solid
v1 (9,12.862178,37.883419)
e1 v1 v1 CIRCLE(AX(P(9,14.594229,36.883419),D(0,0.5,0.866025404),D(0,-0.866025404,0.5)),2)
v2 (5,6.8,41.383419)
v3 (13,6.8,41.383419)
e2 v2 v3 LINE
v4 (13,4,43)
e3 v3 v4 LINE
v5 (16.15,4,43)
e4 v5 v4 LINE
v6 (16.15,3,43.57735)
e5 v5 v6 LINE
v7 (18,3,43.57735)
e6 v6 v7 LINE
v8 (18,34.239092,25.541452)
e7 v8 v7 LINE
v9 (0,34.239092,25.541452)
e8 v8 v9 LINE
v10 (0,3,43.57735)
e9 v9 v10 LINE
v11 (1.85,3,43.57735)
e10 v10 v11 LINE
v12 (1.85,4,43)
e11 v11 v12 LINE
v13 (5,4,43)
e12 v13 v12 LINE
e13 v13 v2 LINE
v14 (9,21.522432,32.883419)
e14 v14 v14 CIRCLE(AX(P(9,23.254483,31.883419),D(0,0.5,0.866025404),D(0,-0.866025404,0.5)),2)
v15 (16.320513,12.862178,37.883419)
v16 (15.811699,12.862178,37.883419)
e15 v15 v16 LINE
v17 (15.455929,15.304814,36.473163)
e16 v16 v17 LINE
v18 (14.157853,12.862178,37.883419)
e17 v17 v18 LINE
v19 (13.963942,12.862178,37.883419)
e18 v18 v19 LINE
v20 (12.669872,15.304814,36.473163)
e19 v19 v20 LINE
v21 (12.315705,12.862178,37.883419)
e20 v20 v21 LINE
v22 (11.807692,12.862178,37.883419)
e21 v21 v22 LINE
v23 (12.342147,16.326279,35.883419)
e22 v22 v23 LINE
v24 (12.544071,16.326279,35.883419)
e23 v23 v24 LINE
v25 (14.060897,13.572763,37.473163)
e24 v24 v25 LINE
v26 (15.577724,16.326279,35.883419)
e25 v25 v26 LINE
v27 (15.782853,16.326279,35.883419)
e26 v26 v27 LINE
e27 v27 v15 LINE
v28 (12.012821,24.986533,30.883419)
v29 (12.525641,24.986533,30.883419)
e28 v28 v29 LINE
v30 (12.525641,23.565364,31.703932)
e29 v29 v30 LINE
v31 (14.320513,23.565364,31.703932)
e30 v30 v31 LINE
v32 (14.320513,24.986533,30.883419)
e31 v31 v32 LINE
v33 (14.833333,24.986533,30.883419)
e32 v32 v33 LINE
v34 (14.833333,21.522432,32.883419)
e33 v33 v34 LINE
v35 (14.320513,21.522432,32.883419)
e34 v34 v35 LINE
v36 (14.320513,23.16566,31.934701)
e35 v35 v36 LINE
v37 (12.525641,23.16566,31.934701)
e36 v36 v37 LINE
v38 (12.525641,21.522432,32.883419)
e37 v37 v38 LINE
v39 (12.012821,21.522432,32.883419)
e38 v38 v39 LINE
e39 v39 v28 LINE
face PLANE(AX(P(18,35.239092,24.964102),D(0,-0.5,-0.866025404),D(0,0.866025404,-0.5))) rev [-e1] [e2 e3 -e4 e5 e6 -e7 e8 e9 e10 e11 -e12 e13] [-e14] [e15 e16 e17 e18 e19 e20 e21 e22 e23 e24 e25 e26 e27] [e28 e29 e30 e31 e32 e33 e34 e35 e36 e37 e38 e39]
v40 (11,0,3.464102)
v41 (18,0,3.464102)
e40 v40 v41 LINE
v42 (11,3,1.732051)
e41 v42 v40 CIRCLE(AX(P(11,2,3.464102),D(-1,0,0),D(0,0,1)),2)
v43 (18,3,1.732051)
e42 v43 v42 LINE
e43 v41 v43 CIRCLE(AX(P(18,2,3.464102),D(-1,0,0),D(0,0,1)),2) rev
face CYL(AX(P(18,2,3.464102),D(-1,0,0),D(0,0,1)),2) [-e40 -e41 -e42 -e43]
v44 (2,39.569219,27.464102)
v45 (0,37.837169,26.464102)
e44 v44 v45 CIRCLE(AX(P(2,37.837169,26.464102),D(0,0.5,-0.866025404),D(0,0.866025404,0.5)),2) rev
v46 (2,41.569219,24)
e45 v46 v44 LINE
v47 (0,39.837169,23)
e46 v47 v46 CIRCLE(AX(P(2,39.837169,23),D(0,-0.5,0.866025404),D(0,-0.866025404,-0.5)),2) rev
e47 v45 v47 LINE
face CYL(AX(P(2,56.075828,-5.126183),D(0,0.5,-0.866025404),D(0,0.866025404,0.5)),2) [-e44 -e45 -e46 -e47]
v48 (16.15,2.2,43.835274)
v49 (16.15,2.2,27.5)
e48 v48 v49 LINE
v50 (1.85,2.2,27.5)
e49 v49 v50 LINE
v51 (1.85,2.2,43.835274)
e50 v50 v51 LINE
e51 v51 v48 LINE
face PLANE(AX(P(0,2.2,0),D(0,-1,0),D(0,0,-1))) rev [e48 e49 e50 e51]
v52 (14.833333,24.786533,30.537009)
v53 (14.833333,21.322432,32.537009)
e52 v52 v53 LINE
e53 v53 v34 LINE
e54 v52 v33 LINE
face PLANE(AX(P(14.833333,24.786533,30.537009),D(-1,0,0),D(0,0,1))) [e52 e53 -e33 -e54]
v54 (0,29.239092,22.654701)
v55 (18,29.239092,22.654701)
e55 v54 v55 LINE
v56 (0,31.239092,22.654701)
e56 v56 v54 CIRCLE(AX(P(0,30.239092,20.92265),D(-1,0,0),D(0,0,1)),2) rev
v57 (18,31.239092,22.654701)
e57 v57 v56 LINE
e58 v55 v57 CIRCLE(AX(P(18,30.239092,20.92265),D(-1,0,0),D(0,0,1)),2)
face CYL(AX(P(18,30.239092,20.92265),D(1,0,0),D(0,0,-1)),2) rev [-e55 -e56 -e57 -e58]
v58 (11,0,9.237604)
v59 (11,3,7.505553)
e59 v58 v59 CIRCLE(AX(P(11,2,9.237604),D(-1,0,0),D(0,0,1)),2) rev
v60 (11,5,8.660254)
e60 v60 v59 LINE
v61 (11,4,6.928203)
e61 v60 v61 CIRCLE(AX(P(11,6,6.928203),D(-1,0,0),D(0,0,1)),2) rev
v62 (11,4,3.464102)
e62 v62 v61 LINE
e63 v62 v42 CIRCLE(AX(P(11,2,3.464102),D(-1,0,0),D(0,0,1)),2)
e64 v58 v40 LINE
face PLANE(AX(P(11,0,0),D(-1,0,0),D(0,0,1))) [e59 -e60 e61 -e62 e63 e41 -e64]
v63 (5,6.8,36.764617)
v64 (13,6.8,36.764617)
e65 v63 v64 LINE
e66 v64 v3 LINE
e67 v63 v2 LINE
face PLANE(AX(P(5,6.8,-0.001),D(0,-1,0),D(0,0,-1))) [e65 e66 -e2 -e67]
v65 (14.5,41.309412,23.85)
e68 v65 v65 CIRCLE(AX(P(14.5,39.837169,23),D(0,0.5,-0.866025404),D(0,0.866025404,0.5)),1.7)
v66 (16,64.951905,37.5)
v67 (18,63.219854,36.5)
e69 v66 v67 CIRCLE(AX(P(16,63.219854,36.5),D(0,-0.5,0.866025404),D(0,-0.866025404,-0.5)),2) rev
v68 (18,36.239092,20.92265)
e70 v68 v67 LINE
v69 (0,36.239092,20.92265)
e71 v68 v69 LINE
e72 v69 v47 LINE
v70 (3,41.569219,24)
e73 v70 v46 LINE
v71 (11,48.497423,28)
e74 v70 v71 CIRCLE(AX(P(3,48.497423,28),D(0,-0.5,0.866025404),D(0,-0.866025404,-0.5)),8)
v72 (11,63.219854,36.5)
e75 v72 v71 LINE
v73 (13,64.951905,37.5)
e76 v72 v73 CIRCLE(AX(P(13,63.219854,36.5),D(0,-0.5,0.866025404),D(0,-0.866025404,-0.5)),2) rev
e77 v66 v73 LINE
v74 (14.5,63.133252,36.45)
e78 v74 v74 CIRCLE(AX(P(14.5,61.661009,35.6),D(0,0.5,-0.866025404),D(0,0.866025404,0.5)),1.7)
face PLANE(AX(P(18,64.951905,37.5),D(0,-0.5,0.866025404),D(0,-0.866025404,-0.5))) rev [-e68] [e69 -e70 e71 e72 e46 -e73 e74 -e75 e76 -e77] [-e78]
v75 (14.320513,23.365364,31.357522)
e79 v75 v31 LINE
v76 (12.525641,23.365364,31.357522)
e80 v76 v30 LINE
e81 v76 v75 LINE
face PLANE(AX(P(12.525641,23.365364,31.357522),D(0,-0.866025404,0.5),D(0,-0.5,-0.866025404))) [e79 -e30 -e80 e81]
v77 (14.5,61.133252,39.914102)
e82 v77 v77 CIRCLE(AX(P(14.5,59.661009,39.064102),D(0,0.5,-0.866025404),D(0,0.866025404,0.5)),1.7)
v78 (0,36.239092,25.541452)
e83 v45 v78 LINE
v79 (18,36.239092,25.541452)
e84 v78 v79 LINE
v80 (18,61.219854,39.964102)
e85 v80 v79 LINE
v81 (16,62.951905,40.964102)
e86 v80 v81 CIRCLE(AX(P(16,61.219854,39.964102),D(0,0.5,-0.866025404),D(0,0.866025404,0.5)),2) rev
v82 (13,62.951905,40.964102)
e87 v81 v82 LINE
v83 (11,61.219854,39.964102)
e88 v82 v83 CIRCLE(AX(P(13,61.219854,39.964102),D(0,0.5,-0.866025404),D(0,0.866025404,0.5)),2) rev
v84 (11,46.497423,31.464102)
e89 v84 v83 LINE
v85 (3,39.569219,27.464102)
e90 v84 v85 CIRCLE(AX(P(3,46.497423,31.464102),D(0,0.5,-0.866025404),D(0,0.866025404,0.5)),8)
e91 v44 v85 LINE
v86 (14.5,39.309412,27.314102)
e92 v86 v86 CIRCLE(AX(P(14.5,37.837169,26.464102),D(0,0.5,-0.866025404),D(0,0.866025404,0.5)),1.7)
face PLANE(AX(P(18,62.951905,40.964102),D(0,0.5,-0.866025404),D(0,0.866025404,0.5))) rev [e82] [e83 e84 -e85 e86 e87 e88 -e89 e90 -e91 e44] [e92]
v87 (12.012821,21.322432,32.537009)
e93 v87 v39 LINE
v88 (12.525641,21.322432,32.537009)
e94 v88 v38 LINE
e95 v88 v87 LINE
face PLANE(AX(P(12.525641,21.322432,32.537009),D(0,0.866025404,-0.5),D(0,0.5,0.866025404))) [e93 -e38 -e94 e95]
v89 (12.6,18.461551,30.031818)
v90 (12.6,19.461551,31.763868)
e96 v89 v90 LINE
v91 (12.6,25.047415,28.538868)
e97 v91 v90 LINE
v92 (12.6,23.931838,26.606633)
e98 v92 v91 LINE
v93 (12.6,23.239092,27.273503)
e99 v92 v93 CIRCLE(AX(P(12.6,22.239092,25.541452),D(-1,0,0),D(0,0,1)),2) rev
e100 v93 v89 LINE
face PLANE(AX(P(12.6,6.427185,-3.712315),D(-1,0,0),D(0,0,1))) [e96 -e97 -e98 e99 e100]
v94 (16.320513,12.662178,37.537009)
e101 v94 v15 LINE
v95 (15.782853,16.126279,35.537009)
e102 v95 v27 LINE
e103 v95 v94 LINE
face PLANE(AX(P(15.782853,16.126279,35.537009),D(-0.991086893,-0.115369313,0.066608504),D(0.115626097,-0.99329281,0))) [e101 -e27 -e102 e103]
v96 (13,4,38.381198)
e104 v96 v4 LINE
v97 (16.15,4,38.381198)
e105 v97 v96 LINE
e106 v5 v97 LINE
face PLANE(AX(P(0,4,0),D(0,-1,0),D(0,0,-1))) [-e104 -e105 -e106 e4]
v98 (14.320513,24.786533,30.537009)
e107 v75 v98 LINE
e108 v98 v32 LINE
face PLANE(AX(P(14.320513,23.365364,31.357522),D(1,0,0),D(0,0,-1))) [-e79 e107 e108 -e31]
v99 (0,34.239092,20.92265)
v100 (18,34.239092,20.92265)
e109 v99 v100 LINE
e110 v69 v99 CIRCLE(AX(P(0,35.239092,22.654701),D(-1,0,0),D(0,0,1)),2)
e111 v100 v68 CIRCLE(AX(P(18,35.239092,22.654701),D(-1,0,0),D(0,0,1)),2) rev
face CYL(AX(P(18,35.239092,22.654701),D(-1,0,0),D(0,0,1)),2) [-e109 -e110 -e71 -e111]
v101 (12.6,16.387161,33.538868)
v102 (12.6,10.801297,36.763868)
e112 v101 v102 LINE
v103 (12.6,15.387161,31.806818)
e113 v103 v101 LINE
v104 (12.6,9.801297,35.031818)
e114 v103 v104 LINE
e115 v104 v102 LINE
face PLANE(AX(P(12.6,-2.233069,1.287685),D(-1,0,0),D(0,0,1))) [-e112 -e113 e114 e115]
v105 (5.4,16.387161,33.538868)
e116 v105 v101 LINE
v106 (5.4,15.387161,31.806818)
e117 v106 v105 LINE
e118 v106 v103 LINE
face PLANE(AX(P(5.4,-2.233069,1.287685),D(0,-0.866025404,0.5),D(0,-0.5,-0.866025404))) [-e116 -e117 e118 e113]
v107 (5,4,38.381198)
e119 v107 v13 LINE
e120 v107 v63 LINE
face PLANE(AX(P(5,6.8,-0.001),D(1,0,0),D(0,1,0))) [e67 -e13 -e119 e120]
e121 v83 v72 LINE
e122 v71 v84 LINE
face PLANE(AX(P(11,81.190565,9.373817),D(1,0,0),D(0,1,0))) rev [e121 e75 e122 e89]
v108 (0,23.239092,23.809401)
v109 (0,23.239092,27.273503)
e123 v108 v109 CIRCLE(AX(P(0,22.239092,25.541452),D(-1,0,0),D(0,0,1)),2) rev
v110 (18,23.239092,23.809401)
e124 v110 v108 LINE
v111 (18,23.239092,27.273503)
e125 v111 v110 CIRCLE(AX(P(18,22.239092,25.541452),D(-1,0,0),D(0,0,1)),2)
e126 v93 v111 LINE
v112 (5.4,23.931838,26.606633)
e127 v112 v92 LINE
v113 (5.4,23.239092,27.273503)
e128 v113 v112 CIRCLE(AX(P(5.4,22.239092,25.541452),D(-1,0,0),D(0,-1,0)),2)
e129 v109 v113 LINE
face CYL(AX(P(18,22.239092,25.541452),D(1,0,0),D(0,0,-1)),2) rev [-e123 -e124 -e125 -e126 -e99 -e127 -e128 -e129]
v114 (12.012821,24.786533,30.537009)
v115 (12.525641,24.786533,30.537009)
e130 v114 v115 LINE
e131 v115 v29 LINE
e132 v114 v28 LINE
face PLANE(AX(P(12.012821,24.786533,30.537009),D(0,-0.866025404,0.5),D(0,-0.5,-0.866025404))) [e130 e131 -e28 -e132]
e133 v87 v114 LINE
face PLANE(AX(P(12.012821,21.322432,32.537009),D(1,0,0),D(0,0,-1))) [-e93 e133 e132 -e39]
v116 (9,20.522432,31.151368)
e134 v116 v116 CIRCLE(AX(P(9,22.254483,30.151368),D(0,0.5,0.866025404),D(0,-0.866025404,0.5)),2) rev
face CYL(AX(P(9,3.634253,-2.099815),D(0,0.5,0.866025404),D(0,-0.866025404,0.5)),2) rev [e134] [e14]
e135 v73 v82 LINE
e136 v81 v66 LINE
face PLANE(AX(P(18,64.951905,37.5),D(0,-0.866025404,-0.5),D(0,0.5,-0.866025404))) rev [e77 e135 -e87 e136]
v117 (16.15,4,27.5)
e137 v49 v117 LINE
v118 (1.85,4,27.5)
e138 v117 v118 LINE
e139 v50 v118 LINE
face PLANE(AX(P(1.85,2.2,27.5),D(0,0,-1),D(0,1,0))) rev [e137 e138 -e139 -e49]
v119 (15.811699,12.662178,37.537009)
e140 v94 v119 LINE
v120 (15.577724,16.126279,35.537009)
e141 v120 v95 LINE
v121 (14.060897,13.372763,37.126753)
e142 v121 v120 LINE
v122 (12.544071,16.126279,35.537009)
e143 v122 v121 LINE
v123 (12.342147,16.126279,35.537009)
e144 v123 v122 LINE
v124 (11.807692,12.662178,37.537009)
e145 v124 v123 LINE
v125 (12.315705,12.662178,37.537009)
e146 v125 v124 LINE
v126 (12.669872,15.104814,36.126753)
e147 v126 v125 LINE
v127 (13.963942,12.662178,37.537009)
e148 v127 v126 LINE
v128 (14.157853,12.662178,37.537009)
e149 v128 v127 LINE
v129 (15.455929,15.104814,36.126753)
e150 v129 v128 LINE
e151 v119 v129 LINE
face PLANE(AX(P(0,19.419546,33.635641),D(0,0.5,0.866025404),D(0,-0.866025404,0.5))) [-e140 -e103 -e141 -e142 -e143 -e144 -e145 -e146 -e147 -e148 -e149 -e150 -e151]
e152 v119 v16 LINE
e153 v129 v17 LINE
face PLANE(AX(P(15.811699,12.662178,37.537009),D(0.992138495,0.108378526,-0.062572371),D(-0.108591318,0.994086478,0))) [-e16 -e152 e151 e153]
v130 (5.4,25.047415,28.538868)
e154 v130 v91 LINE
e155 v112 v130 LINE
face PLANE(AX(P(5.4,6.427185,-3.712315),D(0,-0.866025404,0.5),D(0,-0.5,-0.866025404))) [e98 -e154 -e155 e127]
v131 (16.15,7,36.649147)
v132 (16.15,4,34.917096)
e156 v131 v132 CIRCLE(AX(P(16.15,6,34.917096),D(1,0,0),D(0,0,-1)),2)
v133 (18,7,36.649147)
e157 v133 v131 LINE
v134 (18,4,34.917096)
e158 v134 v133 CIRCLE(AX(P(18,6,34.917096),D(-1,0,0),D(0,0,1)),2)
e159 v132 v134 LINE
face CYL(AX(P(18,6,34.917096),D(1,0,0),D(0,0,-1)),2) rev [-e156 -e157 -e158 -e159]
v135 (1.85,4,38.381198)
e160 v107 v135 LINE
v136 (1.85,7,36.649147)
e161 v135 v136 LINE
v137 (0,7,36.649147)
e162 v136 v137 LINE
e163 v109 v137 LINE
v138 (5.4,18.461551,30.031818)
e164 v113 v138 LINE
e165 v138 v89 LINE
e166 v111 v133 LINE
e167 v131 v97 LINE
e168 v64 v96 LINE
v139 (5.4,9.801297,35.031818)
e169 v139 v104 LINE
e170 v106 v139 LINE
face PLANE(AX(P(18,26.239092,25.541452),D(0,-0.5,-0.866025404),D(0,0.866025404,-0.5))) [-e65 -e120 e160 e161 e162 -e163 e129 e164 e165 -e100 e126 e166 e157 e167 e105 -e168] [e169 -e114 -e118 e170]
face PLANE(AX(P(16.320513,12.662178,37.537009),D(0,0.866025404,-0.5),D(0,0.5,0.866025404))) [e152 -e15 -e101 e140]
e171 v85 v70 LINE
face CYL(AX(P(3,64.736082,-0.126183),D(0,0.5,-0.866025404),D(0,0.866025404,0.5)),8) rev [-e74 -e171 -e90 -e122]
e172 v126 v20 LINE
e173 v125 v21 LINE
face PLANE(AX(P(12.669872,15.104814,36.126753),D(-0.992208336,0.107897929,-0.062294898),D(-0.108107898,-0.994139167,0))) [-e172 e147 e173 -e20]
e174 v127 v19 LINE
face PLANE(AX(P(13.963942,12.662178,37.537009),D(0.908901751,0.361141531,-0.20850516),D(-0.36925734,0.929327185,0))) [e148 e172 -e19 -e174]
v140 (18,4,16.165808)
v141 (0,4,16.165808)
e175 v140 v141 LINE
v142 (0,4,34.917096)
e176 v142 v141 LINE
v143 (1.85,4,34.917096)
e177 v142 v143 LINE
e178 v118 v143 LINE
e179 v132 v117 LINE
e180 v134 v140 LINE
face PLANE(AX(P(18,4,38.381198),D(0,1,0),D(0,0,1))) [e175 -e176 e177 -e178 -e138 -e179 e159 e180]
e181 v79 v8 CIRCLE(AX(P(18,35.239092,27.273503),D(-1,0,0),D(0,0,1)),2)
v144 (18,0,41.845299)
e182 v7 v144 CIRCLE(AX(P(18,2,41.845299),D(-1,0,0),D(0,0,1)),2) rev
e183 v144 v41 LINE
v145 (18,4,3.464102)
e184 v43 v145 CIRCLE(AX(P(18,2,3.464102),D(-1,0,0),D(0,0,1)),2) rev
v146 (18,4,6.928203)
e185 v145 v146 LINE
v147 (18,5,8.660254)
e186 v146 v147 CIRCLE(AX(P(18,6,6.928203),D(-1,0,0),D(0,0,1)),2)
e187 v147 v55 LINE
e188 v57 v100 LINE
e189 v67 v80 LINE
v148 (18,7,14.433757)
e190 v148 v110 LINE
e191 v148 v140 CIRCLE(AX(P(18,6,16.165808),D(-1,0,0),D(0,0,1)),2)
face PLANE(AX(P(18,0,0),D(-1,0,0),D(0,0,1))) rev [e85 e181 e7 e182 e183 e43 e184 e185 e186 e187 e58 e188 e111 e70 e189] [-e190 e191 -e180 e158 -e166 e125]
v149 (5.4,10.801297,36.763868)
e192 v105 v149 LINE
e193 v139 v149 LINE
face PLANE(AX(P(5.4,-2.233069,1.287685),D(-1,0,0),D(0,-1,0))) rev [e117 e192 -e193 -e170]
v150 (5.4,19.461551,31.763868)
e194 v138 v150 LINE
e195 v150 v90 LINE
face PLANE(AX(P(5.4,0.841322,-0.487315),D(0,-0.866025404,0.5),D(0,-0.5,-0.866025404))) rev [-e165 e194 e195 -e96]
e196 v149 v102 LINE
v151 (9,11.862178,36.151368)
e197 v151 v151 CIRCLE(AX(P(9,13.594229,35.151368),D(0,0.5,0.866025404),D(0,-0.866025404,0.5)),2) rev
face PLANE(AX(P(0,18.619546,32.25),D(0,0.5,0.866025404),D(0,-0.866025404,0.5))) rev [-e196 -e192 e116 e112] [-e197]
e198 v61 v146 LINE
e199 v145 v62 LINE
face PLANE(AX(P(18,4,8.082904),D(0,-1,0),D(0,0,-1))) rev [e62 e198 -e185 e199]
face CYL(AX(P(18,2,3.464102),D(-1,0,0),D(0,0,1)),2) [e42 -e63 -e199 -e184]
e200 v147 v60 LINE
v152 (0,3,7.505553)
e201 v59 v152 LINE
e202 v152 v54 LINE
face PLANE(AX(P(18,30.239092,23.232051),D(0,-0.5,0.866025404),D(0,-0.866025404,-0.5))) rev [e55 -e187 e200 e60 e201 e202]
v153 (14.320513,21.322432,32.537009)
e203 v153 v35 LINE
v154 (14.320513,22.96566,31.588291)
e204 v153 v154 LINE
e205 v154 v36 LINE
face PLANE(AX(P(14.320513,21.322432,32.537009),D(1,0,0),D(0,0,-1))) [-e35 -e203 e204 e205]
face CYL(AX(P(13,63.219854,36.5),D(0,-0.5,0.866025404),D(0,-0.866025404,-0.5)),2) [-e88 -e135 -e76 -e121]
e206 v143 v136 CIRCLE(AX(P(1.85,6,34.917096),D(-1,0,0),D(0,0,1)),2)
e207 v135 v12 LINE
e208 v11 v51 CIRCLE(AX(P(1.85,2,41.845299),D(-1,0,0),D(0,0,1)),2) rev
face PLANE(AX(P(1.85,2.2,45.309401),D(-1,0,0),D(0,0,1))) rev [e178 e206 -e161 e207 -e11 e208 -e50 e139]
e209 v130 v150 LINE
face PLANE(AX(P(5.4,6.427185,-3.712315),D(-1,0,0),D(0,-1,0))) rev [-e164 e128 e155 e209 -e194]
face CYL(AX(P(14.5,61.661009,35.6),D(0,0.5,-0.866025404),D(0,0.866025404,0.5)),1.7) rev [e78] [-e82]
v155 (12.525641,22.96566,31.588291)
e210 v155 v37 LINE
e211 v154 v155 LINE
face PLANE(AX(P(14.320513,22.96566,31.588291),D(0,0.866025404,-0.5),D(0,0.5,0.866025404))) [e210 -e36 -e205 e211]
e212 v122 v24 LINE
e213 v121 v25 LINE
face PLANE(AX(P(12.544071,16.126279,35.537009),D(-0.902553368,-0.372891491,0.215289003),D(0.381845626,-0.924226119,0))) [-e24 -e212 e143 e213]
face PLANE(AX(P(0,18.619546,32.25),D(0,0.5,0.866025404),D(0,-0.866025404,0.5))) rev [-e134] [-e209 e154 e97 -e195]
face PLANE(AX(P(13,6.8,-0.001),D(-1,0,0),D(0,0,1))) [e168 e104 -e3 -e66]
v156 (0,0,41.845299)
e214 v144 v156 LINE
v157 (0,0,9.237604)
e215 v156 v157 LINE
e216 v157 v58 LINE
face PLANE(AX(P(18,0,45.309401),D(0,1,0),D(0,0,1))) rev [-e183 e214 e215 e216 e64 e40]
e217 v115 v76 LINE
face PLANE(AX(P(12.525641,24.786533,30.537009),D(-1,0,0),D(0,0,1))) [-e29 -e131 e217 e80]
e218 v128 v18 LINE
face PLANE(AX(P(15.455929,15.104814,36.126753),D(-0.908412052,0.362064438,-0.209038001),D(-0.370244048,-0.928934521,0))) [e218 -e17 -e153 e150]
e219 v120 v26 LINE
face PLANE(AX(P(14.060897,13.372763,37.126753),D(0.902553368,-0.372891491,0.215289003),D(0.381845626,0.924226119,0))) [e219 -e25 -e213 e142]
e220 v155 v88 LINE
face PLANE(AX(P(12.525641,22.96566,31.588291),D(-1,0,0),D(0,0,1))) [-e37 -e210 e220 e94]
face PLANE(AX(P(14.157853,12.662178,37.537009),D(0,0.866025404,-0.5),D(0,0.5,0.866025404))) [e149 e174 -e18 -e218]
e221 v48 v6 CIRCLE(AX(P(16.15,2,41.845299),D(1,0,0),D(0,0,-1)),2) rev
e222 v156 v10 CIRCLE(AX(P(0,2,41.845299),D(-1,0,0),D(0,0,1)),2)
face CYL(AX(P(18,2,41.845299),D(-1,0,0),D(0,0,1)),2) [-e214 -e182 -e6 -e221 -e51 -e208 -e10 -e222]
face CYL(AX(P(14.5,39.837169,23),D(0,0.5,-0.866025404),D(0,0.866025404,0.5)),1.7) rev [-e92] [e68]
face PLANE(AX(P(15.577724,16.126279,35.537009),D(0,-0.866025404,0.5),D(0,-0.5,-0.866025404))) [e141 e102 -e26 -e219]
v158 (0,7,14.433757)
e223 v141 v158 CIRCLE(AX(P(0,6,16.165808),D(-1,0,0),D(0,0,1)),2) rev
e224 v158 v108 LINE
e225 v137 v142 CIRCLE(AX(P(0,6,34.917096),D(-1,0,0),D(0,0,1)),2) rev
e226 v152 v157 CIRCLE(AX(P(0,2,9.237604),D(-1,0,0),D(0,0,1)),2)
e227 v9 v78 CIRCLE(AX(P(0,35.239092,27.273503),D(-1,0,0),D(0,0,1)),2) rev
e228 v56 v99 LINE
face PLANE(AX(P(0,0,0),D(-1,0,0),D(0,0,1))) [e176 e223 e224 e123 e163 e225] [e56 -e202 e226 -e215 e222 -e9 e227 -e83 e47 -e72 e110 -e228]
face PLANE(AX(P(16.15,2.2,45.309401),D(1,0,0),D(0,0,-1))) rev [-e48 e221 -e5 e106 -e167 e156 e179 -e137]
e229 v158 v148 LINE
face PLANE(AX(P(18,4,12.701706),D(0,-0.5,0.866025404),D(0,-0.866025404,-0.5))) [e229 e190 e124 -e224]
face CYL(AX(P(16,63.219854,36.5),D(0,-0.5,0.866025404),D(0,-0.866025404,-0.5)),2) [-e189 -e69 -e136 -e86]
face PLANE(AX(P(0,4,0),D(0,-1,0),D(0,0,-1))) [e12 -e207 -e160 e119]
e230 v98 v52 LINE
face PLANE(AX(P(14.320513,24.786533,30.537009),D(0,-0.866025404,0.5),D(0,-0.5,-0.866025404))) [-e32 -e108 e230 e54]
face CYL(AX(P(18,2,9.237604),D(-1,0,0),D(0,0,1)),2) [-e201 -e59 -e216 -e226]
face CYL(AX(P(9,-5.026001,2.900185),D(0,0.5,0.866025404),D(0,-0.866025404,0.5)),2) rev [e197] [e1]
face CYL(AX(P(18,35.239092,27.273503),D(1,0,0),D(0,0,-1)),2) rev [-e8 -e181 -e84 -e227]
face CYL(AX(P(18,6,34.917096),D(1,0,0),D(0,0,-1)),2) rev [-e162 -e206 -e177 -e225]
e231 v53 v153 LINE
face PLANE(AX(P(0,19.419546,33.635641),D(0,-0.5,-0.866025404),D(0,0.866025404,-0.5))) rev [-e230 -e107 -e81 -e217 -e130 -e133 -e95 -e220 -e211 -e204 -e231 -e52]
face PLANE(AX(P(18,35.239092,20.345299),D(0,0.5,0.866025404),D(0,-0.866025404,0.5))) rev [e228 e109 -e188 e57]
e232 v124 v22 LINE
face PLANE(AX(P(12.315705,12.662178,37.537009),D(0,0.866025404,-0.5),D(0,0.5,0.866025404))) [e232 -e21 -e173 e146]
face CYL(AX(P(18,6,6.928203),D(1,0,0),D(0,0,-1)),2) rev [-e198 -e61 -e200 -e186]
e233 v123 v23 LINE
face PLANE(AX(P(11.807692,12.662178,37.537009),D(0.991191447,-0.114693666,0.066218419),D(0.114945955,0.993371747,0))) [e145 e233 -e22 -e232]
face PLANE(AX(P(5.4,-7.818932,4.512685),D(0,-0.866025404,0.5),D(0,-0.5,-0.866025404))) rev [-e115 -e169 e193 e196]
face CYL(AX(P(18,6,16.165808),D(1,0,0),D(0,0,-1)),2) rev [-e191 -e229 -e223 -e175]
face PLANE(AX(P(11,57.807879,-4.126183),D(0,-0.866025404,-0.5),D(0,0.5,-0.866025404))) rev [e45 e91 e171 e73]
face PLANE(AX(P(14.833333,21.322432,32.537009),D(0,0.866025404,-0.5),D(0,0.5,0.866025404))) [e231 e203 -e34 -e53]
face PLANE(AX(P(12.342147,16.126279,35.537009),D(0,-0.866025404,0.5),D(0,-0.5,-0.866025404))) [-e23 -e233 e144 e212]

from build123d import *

# Parameters (mm, degrees)
BOSS_EXTRU_1_DEPTH      = 18
D_GAGEMENT_M31_D        = 3.4
ENL_V_MAT_EXTRU_5_REACH = 82.979
ESQUISSE7_W             = 11
ESQUISSE7_H             = 27
ENL_V_MAT_EXTRU_6_DEPTH = 11
ESQUISSE4_W             = 14.3
ESQUISSE4_H             = 17.809401077
ENL_V_MAT_EXTRU_1_DEPTH = 1.8
ENL_V_MAT_EXTRU_2_REACH = 83.214
ESQUISSE5_W             = 8
ESQUISSE5_H             = 2.8
ENL_V_MAT_EXTRU_3_REACH = 63.446
ENL_V_START             = -2
ESQUISSE6_W             = 7.2
ESQUISSE6_H             = 6.45
ENL_V_MAT_EXTRU_4_REACH = 61.446
ESQUISSE6_3_R           = 2
ENL_V_MAT_EXTRU_7_DEPTH = 0.4
CONG_1_R                = 2
CONG_2_R                = 8


with BuildPart() as part:
    # Esquisse1 → Boss.-Extru.1 (new body)
    with BuildSketch(Plane(origin=(0, 0, 0), x_dir=(0, 0, -1), z_dir=(1, 0, 0))):
        Polygon((-37.5, 64.951905284), (-40.964101615, 62.951905284), (-24.964101615, 35.239092363), (-45.309401077, 0), (0, 0), (-2.309401077, 4), (-8.082903769, 4), (-23.232050808, 30.239092363), (-20.345299462, 35.239092363), align=None)
        Polygon((-38.381197846, 4), (-12.701705922, 4), (-25.541451884, 26.239092363), align=None, mode=Mode.SUBTRACT)
    extrude(amount=BOSS_EXTRU_1_DEPTH)

    # Dégagement M31 (through all)
    with Locations(Plane(origin=(0, 0, 0), x_dir=(-1, 0, 0), z_dir=(0, 0.5000000000000047, -0.866025403784436))):
        with Locations((-14.5, 71.2), (-14.5, 46)):
            Hole(D_GAGEMENT_M31_D / 2)

    # Esquisse7 → Enlèv. mat.-Extru.5 (cut, up to next)
    with BuildSketch(Plane(origin=(0, -2, 3.464101615), x_dir=(1, 0, 0), z_dir=(0, -0.5000000000000047, 0.8660254037844359)), mode=Mode.PRIVATE) as enl_v_mat_extru_5_sk1:
        with Locations((5.5, 61.5)):
            Rectangle(ESQUISSE7_W, ESQUISSE7_H)
    enl_v_mat_extru_5_tool1 = extrude(enl_v_mat_extru_5_sk1.sketch, amount=-ENL_V_MAT_EXTRU_5_REACH, mode=Mode.PRIVATE) & part.part
    add(enl_v_mat_extru_5_tool1.solids().sort_by_distance((5.5, 51.260562, 34.214102))[0], mode=Mode.SUBTRACT)

    # Esquisse8 → Enlèv. mat.-Extru.6 (cut)
    with BuildSketch(Plane.ZY):
        Polygon((0, 0), (2.309401077, 4), (8.082903769, 4), (5.773502692, 0), align=None)
    extrude(amount=-ENL_V_MAT_EXTRU_6_DEPTH, mode=Mode.SUBTRACT)

    # Esquisse4 → Enlèv. mat.-Extru.1 (cut)
    with BuildSketch(Plane(origin=(0, 4, 0), x_dir=(1, 0, 0), z_dir=(0, 1, 0))):
        with Locations((9, -36.404700539)):
            Rectangle(ESQUISSE4_W, ESQUISSE4_H)
    extrude(amount=-ENL_V_MAT_EXTRU_1_DEPTH, mode=Mode.SUBTRACT)

    # Enlèv. mat.-Extru.2: up to this plane
    enl_v_mat_extru_2_end = Plane(origin=(18, 26.239092363, 25.541451884), z_dir=(0, -0.5000000000000034, -0.8660254037844367))
    # Esquisse5 → Enlèv. mat.-Extru.2 (cut, up to the surface)
    with BuildSketch(Plane(origin=(0, 0, 45.309401077), x_dir=(-1, 0, 0), z_dir=(0, 0, -1)), mode=Mode.PRIVATE) as enl_v_mat_extru_2_sk1:
        with Locations((-9, 5.4)):
            Rectangle(ESQUISSE5_W, ESQUISSE5_H)
    enl_v_mat_extru_2_tool1 = split(extrude(enl_v_mat_extru_2_sk1.sketch, amount=ENL_V_MAT_EXTRU_2_REACH, mode=Mode.PRIVATE), bisect_by=enl_v_mat_extru_2_end, keep=Keep.BOTH, mode=Mode.PRIVATE)
    add(enl_v_mat_extru_2_tool1.solids().sort_by_distance((9, 5.4, 45.309401))[0], mode=Mode.SUBTRACT)

    # Esquisse6 → Enlèv. mat.-Extru.3 (cut, up to next)
    with BuildSketch(Plane(origin=(0, 19.619546181, 33.982050808), x_dir=(1, 0, 0), z_dir=(0, 0.5000000000000042, 0.8660254037844363)).offset(ENL_V_START), mode=Mode.PRIVATE) as enl_v_mat_extru_3_sk1:
        with Locations((9, -5.802736877)):
            Rectangle(ESQUISSE6_W, ESQUISSE6_H)
    enl_v_mat_extru_3_tool1 = extrude(enl_v_mat_extru_3_sk1.sketch, amount=-ENL_V_MAT_EXTRU_3_REACH, mode=Mode.PRIVATE) & part.part
    # Esquisse6 → Enlèv. mat.-Extru.3 (cut, up to next)
    with BuildSketch(Plane(origin=(0, 19.619546181, 33.982050808), x_dir=(1, 0, 0), z_dir=(0, 0.5000000000000042, 0.8660254037844363)).offset(ENL_V_START), mode=Mode.PRIVATE) as enl_v_mat_extru_3_sk2:
        with Locations((9, 4.197263123)):
            Rectangle(ESQUISSE6_W, ESQUISSE6_H)
    enl_v_mat_extru_3_tool2 = extrude(enl_v_mat_extru_3_sk2.sketch, amount=-ENL_V_MAT_EXTRU_3_REACH, mode=Mode.PRIVATE) & part.part
    add(enl_v_mat_extru_3_tool1.solids().sort_by_distance((9, 13.594229, 35.151368))[0], mode=Mode.SUBTRACT)
    add(enl_v_mat_extru_3_tool2.solids().sort_by_distance((9, 22.254483, 30.151368))[0], mode=Mode.SUBTRACT)

    # Esquisse6<3> → Enlèv. mat.-Extru.4 (cut, up to next)
    with BuildSketch(Plane(origin=(0, 19.619546181, 33.982050808), x_dir=(1, 0, 0), z_dir=(0, 0.5000000000000042, 0.8660254037844363)), mode=Mode.PRIVATE) as enl_v_mat_extru_4_sk1:
        with Locations(Location((9, -5.802736877, 0), (0, 0, 270))):
            Circle(ESQUISSE6_3_R)
    enl_v_mat_extru_4_tool1 = extrude(enl_v_mat_extru_4_sk1.sketch, amount=-ENL_V_MAT_EXTRU_4_REACH, mode=Mode.PRIVATE) & part.part
    # Esquisse6<3> → Enlèv. mat.-Extru.4 (cut, up to next)
    with BuildSketch(Plane(origin=(0, 19.619546181, 33.982050808), x_dir=(1, 0, 0), z_dir=(0, 0.5000000000000042, 0.8660254037844363)), mode=Mode.PRIVATE) as enl_v_mat_extru_4_sk2:
        with Locations(Location((9, 4.197263123, 0), (0, 0, 270))):
            Circle(ESQUISSE6_3_R)
    enl_v_mat_extru_4_tool2 = extrude(enl_v_mat_extru_4_sk2.sketch, amount=-ENL_V_MAT_EXTRU_4_REACH, mode=Mode.PRIVATE) & part.part
    add(enl_v_mat_extru_4_tool1.solids().sort_by_distance((9, 14.594229, 36.883419))[0], mode=Mode.SUBTRACT)
    add(enl_v_mat_extru_4_tool2.solids().sort_by_distance((9, 23.254483, 31.883419))[0], mode=Mode.SUBTRACT)

    # Esquisse9 → Enlèv. mat.-Extru.7 (cut)
    with BuildSketch(Plane(origin=(0, 19.619546181, 33.982050808), x_dir=(1, 0, 0), z_dir=(0, 0.5000000000000042, 0.8660254037844363))):
        Polygon((12.012820513, 6.197263123), (12.525641026, 6.197263123), (12.525641026, 4.556237482), (14.320512821, 4.556237482), (14.320512821, 6.197263123), (14.833333333, 6.197263123), (14.833333333, 2.197263123), (14.320512821, 2.197263123), (14.320512821, 4.09469902), (12.525641026, 4.09469902), (12.525641026, 2.197263123), (12.012820513, 2.197263123), align=None)
        Polygon((11.807692308, -7.802736877), (12.342147436, -3.802736877), (12.544070513, -3.802736877), (14.060897436, -6.982224057), (15.577724359, -3.802736877), (15.782852564, -3.802736877), (16.320512821, -7.802736877), (15.811698718, -7.802736877), (15.455929487, -4.982224057), (14.157852564, -7.802736877), (13.963942308, -7.802736877), (12.669871795, -4.982224057), (12.315705128, -7.802736877), align=None)
    extrude(amount=-ENL_V_MAT_EXTRU_7_DEPTH, mode=Mode.SUBTRACT)

    # Congé1
    # the kernel refuses this fillet: 2 mm, written as the material it adds along each edge
    with BuildSketch(Plane(origin=(0, 4, 38.381197846), x_dir=(0, 0.8660254037844363, -0.5000000000000039), z_dir=(1, 0, 0)), Plane(origin=(16.15, 4, 38.381197846), x_dir=(0, 0.8660254037844363, -0.5000000000000039), z_dir=(1, 0, 0))) as cong_1_piece_1:
        with BuildLine():
            CenterArc((CONG_1_R * 1.73205080757, -CONG_1_R), CONG_1_R, 90, 120)
            Line((CONG_1_R * 0.866025403784, -CONG_1_R * 1.5), (0, 0))
            Line((0, 0), (CONG_1_R * 1.73205080757, 0))
        make_face()
    extrude(amount=1.85)
    with BuildSketch(Plane(origin=(0, 4, 12.701705922), x_dir=(0, 0.8660254037844365, 0.5000000000000036), z_dir=(1, 0, 0))) as cong_1_piece_2:
        with BuildLine():
            CenterArc((CONG_1_R * 1.73205080757, CONG_1_R), CONG_1_R, 150, 120)
            Line((CONG_1_R * 0.866025403784, CONG_1_R * 1.5), (0, 0))
            Line((0, 0), (CONG_1_R * 1.73205080757, 0))
        make_face()
    extrude(amount=18)
    with BuildSketch(Plane(origin=(0, 26.239092363, 25.541451884), x_dir=(0, -0.8660254037844365, 0.500000000000004), z_dir=(1, 0, 0))) as cong_1_piece_3_section:
        with BuildLine():
            CenterArc((CONG_1_R * 1.73205080757, CONG_1_R), CONG_1_R, 150, 120)
            Line((CONG_1_R * 0.866025403784, CONG_1_R * 1.5), (0, 0))
            Line((0, 0), (CONG_1_R * 1.73205080757, 0))
        make_face()
    cong_1_piece_3 = extrude(amount=26.660254038, mode=Mode.PRIVATE)
    cong_1_piece_3 = split(cong_1_piece_3, bisect_by=Plane(origin=(5.4, 23.813443604, 26.862688053), z_dir=(-1, 0, 0)), keep=Keep.TOP, mode=Mode.PRIVATE)
    add(cong_1_piece_3)
    with BuildSketch(Plane(origin=(-8.660254038, 26.239092363, 25.541451884), x_dir=(0, -0.8660254037844365, 0.500000000000004), z_dir=(1, 0, 0))) as cong_1_piece_4_section:
        with BuildLine():
            CenterArc((CONG_1_R * 1.73205080757, CONG_1_R), CONG_1_R, 150, 120)
            Line((CONG_1_R * 0.866025403784, CONG_1_R * 1.5), (0, 0))
            Line((0, 0), (CONG_1_R * 1.73205080757, 0))
        make_face()
    cong_1_piece_4 = extrude(amount=26.660254038, mode=Mode.PRIVATE)
    cong_1_piece_4 = split(cong_1_piece_4, bisect_by=Plane(origin=(9, 23.670920351, 26.154710464), z_dir=(0, 0.8660254037844363, -0.5000000000000042)), keep=Keep.TOP, mode=Mode.PRIVATE)
    cong_1_piece_4 = split(cong_1_piece_4, bisect_by=Plane(origin=(5.4, 24.793273023, 25.506719847), z_dir=(1, 0, 0)), keep=Keep.TOP, mode=Mode.PRIVATE)
    add(cong_1_piece_4)
    with BuildSketch(Plane(origin=(-8.660254038, 26.239092363, 25.541451884), x_dir=(0, -0.8660254037844365, 0.500000000000004), z_dir=(1, 0, 0))) as cong_1_piece_5_section:
        with BuildLine():
            CenterArc((CONG_1_R * 1.73205080757, CONG_1_R), CONG_1_R, 150, 120)
            Line((CONG_1_R * 0.866025403784, CONG_1_R * 1.5), (0, 0))
            Line((0, 0), (CONG_1_R * 1.73205080757, 0))
        make_face()
    cong_1_piece_5 = extrude(amount=26.660254038, mode=Mode.PRIVATE)
    cong_1_piece_5 = split(cong_1_piece_5, bisect_by=Plane(origin=(12.6, 23.813443604, 26.862688053), z_dir=(1, 0, 0)), keep=Keep.TOP, mode=Mode.PRIVATE)
    add(cong_1_piece_5)
    with BuildSketch(Plane(origin=(0, 35.239092363, 24.964101615), x_dir=(0, 0.8660254037844364, 0.5000000000000042), z_dir=(1, 0, 0)), Plane(origin=(0, 30.239092363, 23.232050808), x_dir=(0, -0.8660254037844379, -0.5000000000000012), z_dir=(1, 0, 0))) as cong_1_piece_6:
        with BuildLine():
            CenterArc((CONG_1_R * 0.57735026919, CONG_1_R), CONG_1_R, 210, 60)
            Line((-CONG_1_R * 0.288675134595, CONG_1_R * 0.5), (0, 0))
            Line((0, 0), (CONG_1_R * 0.57735026919, 0))
        make_face()
    extrude(amount=18)
    with BuildSketch(Plane(origin=(11, 4, 8.082903769), x_dir=(0, 0, -1), z_dir=(1, 0, 0))) as cong_1_piece_7:
        with BuildLine():
            CenterArc((CONG_1_R * 0.57735026919, CONG_1_R), CONG_1_R, 210, 60)
            Line((-CONG_1_R * 0.288675134595, CONG_1_R * 0.5), (0, 0))
            Line((0, 0), (CONG_1_R * 0.57735026919, 0))
        make_face()
    extrude(amount=7)
    # the kernel refuses this fillet: 2 mm, written as the material it takes off along each edge
    with BuildSketch(Plane(origin=(-8.660254038, 0, 45.309401077), x_dir=(0, 0, -1), z_dir=(1, 0, 0))) as cong_1_2_piece_1:
        with BuildLine():
            CenterArc((CONG_1_R * 1.73205080757, CONG_1_R), CONG_1_R, 150, 120)
            Line((CONG_1_R * 0.866025403784, CONG_1_R * 1.5), (0, 0))
            Line((0, 0), (CONG_1_R * 1.73205080757, 0))
        make_face()
    extrude(amount=35.320508076, mode=Mode.SUBTRACT)
    with BuildSketch(Plane(origin=(18, 67.451905284, 33.169872981), x_dir=(-1, 0, 0), z_dir=(0, -0.5000000000000019, 0.8660254037844376)), Plane(origin=(0, 37.069219382, 31.794228634), x_dir=(1, 0, 0), z_dir=(0, 0.5000000000000047, -0.8660254037844359)), Plane(origin=(11, 60.451905284, 45.294228634), x_dir=(1, 0, 0), z_dir=(0, 0.5000000000000047, -0.8660254037844359))) as cong_1_2_piece_2:
        with BuildLine():
            CenterArc((CONG_1_R, CONG_1_R), CONG_1_R, 180, 90)
            Line((0, CONG_1_R), (0, 0))
            Line((0, 0), (CONG_1_R, 0))
        make_face()
    extrude(amount=14, mode=Mode.SUBTRACT)
    with BuildSketch(Plane(origin=(-2.886751346, 35.239092363, 20.345299462), x_dir=(0, 0.866025403784436, 0.5000000000000046), z_dir=(1, 0, 0))) as cong_1_2_piece_3:
        with BuildLine():
            CenterArc((CONG_1_R * 0.57735026919, CONG_1_R), CONG_1_R, 210, 60)
            Line((-CONG_1_R * 0.288675134595, CONG_1_R * 0.5), (0, 0))
            Line((0, 0), (CONG_1_R * 0.57735026919, 0))
        make_face()
    extrude(amount=23.773502692, mode=Mode.SUBTRACT)
    with BuildSketch(Plane(origin=(8.113248654, 4, 2.309401077), x_dir=(0, 0, 1), z_dir=(1, 0, 0))) as cong_1_2_piece_4:
        with BuildLine():
            CenterArc((CONG_1_R * 0.57735026919, CONG_1_R), CONG_1_R, 210, 60)
            Line((-CONG_1_R * 0.288675134595, CONG_1_R * 0.5), (0, 0))
            Line((0, 0), (CONG_1_R * 0.57735026919, 0))
        make_face()
    extrude(amount=12.773502692, mode=Mode.SUBTRACT)
    with BuildSketch(Plane(origin=(2.339745962, 0, 0), x_dir=(0, 0.8660254037844364, 0.500000000000004), z_dir=(1, 0, 0))) as cong_1_2_piece_5:
        with BuildLine():
            CenterArc((CONG_1_R * 1.73205080757, CONG_1_R), CONG_1_R, 150, 120)
            Line((CONG_1_R * 0.866025403784, CONG_1_R * 1.5), (0, 0))
            Line((0, 0), (CONG_1_R * 1.73205080757, 0))
        make_face()
    extrude(amount=24.320508076, mode=Mode.SUBTRACT)
    with BuildSketch(Plane(origin=(-8.660254038, 0, 5.773502692), x_dir=(0, 0.8660254037844365, 0.5000000000000038), z_dir=(1, 0, 0))) as cong_1_2_piece_6:
        with BuildLine():
            CenterArc((CONG_1_R * 1.73205080757, CONG_1_R), CONG_1_R, 150, 120)
            Line((CONG_1_R * 0.866025403784, CONG_1_R * 1.5), (0, 0))
            Line((0, 0), (CONG_1_R * 1.73205080757, 0))
        make_face()
    extrude(amount=19.660254038, mode=Mode.SUBTRACT)

    # Congé2
    cong_2_edges = [part.edges().sort_by_distance(p)[0] for p in [
        (11, 40.569219382, 25.732050808),
    ]]
    fillet(cong_2_edges, radius=CONG_2_R)


solid = part.part
